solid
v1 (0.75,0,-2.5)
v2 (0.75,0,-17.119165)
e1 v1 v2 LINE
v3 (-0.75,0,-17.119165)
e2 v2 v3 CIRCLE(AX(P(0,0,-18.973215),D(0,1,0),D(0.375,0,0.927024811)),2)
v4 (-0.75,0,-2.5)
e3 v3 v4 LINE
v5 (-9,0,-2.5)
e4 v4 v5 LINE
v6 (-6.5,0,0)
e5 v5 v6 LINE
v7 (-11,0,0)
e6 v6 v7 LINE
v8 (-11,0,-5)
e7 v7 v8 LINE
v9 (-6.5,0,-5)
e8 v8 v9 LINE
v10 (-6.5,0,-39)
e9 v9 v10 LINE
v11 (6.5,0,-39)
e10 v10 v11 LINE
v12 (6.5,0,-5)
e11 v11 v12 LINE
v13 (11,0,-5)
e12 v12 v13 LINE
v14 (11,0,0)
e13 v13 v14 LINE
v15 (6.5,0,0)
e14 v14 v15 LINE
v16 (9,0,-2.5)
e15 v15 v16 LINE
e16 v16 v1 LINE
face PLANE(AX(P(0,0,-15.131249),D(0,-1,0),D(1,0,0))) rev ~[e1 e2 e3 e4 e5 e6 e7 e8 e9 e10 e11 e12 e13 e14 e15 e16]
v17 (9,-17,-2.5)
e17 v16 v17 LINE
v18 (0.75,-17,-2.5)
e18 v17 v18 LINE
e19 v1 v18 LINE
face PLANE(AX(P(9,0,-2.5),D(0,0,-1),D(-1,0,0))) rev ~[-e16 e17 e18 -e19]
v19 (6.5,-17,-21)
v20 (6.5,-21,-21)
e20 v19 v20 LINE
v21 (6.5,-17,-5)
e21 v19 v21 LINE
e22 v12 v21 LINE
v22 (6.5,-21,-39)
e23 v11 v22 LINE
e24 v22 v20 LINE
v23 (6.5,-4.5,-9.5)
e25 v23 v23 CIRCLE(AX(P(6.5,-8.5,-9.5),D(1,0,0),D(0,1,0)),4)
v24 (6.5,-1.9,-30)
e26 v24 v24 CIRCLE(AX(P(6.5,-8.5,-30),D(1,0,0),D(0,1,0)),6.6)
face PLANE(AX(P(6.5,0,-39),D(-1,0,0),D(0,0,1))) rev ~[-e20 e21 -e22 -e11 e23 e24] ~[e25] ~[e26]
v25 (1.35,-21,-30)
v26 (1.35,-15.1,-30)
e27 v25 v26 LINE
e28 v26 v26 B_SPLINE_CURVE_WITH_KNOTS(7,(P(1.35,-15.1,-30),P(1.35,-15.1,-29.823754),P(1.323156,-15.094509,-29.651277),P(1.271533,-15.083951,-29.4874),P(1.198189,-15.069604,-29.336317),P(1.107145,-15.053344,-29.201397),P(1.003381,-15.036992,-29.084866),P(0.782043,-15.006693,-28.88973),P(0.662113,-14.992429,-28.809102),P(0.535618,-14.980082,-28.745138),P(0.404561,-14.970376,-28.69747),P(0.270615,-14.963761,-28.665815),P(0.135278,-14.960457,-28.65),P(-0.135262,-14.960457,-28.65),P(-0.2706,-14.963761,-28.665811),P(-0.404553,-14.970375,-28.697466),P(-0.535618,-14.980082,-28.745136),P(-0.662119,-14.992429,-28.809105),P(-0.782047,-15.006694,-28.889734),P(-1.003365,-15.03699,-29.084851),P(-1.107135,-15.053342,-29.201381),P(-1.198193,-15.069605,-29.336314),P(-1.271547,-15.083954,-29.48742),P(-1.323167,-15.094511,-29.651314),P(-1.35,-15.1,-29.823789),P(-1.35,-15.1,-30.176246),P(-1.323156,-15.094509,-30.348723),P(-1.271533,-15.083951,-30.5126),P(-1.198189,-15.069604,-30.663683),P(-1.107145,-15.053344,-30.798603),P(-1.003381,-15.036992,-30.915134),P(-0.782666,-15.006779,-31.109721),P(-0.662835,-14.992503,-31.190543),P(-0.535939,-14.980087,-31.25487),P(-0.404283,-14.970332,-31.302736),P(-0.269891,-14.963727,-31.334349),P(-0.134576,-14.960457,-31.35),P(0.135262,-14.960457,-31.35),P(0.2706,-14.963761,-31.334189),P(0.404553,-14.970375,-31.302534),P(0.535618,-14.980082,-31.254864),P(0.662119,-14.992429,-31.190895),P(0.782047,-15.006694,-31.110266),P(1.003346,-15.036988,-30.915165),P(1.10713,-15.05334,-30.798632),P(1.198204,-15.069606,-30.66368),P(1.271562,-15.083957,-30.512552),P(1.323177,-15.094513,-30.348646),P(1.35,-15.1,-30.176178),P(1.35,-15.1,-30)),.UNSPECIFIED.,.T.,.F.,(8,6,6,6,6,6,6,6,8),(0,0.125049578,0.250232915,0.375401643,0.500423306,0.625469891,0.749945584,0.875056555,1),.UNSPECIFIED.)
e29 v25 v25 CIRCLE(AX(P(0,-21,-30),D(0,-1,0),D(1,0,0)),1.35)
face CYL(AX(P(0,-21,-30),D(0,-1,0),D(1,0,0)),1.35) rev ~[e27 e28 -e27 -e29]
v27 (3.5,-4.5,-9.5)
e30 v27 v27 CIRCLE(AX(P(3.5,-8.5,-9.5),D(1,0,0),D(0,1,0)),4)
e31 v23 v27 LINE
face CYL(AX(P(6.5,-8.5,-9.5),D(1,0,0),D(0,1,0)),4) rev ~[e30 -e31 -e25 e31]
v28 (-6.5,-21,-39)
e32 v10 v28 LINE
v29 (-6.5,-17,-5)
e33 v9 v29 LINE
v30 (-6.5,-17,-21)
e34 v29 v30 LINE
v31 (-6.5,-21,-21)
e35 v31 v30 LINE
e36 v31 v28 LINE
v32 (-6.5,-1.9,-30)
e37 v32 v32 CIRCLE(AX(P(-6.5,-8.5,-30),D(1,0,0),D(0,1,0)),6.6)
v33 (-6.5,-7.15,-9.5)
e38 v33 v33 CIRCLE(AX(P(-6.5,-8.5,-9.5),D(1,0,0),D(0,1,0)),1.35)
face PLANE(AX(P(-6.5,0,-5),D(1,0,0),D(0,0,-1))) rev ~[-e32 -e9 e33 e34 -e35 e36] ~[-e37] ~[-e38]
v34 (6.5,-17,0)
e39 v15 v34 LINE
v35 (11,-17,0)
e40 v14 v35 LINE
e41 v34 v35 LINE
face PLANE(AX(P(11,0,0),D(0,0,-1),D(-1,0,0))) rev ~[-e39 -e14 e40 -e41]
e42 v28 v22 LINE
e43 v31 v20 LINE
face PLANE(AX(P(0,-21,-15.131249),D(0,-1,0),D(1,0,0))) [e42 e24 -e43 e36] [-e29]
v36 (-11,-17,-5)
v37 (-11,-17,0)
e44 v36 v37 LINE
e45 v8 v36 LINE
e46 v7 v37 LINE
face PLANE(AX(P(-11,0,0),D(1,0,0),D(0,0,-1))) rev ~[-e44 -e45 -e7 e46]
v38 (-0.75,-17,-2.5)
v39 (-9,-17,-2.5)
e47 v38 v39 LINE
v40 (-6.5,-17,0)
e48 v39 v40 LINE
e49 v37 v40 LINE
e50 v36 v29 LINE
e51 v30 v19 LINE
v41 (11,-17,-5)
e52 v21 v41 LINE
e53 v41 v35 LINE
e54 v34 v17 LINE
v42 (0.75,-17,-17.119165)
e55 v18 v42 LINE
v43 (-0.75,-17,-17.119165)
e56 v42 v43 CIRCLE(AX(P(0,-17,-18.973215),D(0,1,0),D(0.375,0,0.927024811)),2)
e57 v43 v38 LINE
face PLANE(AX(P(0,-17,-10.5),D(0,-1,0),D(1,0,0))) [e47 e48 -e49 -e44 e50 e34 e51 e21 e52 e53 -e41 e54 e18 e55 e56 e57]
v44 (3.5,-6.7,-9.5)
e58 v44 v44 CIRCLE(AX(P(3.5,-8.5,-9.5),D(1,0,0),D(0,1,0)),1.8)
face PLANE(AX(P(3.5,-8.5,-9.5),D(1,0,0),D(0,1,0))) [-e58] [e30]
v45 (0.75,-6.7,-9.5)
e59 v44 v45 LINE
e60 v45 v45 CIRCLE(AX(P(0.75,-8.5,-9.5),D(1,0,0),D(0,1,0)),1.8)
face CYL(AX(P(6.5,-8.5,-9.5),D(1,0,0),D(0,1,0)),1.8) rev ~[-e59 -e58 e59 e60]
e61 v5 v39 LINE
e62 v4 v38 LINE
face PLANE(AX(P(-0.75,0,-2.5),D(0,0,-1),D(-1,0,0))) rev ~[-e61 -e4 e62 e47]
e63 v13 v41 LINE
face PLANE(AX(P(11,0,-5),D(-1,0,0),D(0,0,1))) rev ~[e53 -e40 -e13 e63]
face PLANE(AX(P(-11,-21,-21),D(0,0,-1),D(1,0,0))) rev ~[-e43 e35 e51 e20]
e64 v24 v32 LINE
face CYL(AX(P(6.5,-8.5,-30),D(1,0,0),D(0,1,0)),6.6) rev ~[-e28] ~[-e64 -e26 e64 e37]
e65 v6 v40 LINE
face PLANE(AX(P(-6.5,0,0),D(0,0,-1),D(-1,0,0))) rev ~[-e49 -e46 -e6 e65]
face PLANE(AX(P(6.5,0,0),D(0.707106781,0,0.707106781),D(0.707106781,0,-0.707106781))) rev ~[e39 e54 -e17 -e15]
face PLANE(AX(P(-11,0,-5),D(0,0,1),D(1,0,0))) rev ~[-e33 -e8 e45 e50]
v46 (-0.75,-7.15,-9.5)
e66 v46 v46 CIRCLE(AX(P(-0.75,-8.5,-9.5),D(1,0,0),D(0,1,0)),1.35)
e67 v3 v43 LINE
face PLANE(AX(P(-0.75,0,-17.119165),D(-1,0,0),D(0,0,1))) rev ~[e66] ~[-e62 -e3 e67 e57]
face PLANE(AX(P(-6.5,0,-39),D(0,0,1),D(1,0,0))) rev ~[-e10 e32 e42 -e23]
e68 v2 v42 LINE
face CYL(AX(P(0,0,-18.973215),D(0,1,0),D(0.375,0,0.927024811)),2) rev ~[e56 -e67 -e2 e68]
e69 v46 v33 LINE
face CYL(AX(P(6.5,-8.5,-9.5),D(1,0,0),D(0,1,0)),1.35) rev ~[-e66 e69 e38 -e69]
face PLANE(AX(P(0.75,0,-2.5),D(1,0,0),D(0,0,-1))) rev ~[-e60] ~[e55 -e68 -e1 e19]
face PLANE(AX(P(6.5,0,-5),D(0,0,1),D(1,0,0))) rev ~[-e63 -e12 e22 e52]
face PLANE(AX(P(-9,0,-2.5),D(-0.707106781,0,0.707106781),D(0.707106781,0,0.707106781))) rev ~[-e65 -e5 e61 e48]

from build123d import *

# Parameters (mm, degrees)
F1_DEPTH  = 21
F2_W      = 22
F2_H      = 21
F3_DEPTH  = 4
F4_R      = 6.6
F4_R_2    = 1.35
F5_DEPTH  = 17.501
F6_R      = 1.8
F7_DEPTH  = 7
F8_R      = 4
F9_DEPTH  = 3
F10_R     = 1.35
F11_DEPTH = 12


# Not quite as in the source:
# - a feature names something its author has since deleted; it is built from what else it names


with BuildPart() as f1:
    # F0 (on Front) → F1 (new body)
    with BuildSketch(Plane.XZ):
        with BuildLine():
            Line((-9, -2.5), (-6.5, 0))
            Line((-6.5, 0), (-11, 0))
            Line((-11, 0), (-11, -5))
            Line((-11, -5), (-6.5, -5))
            Line((-6.5, -5), (-6.5, -39))
            Line((-6.5, -39), (6.5, -39))
            Line((6.5, -39), (6.5, -5))
            Line((6.5, -5), (11, -5))
            Line((11, -5), (11, 0))
            Line((11, 0), (6.5, 0))
            Line((6.5, 0), (9, -2.5))
            Line((9, -2.5), (0.75, -2.5))
            Line((0.75, -2.5), (0.75, -17.11916493))
            ThreePointArc((0.75, -17.11916493), (0, -20.9732145518), (-0.75, -17.11916493))
            Line((-0.75, -17.11916493), (-0.75, -2.5))
            Line((-0.75, -2.5), (-9, -2.5))
        make_face()
    extrude(amount=F1_DEPTH)

    # F2 (on face) → F3 (cut)
    with BuildSketch(Plane.XZ.offset(21)):
        with Locations((0, -10.5)):
            Rectangle(F2_W, F2_H)
    extrude(amount=-F3_DEPTH, mode=Mode.SUBTRACT)

    # F4 (on face) → F5 (cut, through all)
    with BuildSketch(Plane.YZ.offset(6.5)):
        with Locations((-8.5, -30)):
            Circle(F4_R)
        with Locations((-8.5, -9.5)):
            Circle(F4_R_2)
    extrude(amount=-F5_DEPTH, mode=Mode.SUBTRACT)

    # F6 (on face) → F7 (cut)
    with BuildSketch(Plane.YZ.offset(6.5)):
        with Locations((-8.5, -9.5)):
            Circle(F6_R)
    extrude(amount=-F7_DEPTH, mode=Mode.SUBTRACT)

    # F8 (on face) → F9 (cut)
    with BuildSketch(Plane.YZ.offset(6.5)):
        with Locations((-8.5, -9.5)):
            Circle(F8_R)
    extrude(amount=-F9_DEPTH, mode=Mode.SUBTRACT)

    # F10 (on face) → F11 (cut)
    with BuildSketch(Plane.XZ.offset(21)):
        with Locations((0, -30)):
            Circle(F10_R)
    extrude(amount=-F11_DEPTH, mode=Mode.SUBTRACT)


solid = f1.part
